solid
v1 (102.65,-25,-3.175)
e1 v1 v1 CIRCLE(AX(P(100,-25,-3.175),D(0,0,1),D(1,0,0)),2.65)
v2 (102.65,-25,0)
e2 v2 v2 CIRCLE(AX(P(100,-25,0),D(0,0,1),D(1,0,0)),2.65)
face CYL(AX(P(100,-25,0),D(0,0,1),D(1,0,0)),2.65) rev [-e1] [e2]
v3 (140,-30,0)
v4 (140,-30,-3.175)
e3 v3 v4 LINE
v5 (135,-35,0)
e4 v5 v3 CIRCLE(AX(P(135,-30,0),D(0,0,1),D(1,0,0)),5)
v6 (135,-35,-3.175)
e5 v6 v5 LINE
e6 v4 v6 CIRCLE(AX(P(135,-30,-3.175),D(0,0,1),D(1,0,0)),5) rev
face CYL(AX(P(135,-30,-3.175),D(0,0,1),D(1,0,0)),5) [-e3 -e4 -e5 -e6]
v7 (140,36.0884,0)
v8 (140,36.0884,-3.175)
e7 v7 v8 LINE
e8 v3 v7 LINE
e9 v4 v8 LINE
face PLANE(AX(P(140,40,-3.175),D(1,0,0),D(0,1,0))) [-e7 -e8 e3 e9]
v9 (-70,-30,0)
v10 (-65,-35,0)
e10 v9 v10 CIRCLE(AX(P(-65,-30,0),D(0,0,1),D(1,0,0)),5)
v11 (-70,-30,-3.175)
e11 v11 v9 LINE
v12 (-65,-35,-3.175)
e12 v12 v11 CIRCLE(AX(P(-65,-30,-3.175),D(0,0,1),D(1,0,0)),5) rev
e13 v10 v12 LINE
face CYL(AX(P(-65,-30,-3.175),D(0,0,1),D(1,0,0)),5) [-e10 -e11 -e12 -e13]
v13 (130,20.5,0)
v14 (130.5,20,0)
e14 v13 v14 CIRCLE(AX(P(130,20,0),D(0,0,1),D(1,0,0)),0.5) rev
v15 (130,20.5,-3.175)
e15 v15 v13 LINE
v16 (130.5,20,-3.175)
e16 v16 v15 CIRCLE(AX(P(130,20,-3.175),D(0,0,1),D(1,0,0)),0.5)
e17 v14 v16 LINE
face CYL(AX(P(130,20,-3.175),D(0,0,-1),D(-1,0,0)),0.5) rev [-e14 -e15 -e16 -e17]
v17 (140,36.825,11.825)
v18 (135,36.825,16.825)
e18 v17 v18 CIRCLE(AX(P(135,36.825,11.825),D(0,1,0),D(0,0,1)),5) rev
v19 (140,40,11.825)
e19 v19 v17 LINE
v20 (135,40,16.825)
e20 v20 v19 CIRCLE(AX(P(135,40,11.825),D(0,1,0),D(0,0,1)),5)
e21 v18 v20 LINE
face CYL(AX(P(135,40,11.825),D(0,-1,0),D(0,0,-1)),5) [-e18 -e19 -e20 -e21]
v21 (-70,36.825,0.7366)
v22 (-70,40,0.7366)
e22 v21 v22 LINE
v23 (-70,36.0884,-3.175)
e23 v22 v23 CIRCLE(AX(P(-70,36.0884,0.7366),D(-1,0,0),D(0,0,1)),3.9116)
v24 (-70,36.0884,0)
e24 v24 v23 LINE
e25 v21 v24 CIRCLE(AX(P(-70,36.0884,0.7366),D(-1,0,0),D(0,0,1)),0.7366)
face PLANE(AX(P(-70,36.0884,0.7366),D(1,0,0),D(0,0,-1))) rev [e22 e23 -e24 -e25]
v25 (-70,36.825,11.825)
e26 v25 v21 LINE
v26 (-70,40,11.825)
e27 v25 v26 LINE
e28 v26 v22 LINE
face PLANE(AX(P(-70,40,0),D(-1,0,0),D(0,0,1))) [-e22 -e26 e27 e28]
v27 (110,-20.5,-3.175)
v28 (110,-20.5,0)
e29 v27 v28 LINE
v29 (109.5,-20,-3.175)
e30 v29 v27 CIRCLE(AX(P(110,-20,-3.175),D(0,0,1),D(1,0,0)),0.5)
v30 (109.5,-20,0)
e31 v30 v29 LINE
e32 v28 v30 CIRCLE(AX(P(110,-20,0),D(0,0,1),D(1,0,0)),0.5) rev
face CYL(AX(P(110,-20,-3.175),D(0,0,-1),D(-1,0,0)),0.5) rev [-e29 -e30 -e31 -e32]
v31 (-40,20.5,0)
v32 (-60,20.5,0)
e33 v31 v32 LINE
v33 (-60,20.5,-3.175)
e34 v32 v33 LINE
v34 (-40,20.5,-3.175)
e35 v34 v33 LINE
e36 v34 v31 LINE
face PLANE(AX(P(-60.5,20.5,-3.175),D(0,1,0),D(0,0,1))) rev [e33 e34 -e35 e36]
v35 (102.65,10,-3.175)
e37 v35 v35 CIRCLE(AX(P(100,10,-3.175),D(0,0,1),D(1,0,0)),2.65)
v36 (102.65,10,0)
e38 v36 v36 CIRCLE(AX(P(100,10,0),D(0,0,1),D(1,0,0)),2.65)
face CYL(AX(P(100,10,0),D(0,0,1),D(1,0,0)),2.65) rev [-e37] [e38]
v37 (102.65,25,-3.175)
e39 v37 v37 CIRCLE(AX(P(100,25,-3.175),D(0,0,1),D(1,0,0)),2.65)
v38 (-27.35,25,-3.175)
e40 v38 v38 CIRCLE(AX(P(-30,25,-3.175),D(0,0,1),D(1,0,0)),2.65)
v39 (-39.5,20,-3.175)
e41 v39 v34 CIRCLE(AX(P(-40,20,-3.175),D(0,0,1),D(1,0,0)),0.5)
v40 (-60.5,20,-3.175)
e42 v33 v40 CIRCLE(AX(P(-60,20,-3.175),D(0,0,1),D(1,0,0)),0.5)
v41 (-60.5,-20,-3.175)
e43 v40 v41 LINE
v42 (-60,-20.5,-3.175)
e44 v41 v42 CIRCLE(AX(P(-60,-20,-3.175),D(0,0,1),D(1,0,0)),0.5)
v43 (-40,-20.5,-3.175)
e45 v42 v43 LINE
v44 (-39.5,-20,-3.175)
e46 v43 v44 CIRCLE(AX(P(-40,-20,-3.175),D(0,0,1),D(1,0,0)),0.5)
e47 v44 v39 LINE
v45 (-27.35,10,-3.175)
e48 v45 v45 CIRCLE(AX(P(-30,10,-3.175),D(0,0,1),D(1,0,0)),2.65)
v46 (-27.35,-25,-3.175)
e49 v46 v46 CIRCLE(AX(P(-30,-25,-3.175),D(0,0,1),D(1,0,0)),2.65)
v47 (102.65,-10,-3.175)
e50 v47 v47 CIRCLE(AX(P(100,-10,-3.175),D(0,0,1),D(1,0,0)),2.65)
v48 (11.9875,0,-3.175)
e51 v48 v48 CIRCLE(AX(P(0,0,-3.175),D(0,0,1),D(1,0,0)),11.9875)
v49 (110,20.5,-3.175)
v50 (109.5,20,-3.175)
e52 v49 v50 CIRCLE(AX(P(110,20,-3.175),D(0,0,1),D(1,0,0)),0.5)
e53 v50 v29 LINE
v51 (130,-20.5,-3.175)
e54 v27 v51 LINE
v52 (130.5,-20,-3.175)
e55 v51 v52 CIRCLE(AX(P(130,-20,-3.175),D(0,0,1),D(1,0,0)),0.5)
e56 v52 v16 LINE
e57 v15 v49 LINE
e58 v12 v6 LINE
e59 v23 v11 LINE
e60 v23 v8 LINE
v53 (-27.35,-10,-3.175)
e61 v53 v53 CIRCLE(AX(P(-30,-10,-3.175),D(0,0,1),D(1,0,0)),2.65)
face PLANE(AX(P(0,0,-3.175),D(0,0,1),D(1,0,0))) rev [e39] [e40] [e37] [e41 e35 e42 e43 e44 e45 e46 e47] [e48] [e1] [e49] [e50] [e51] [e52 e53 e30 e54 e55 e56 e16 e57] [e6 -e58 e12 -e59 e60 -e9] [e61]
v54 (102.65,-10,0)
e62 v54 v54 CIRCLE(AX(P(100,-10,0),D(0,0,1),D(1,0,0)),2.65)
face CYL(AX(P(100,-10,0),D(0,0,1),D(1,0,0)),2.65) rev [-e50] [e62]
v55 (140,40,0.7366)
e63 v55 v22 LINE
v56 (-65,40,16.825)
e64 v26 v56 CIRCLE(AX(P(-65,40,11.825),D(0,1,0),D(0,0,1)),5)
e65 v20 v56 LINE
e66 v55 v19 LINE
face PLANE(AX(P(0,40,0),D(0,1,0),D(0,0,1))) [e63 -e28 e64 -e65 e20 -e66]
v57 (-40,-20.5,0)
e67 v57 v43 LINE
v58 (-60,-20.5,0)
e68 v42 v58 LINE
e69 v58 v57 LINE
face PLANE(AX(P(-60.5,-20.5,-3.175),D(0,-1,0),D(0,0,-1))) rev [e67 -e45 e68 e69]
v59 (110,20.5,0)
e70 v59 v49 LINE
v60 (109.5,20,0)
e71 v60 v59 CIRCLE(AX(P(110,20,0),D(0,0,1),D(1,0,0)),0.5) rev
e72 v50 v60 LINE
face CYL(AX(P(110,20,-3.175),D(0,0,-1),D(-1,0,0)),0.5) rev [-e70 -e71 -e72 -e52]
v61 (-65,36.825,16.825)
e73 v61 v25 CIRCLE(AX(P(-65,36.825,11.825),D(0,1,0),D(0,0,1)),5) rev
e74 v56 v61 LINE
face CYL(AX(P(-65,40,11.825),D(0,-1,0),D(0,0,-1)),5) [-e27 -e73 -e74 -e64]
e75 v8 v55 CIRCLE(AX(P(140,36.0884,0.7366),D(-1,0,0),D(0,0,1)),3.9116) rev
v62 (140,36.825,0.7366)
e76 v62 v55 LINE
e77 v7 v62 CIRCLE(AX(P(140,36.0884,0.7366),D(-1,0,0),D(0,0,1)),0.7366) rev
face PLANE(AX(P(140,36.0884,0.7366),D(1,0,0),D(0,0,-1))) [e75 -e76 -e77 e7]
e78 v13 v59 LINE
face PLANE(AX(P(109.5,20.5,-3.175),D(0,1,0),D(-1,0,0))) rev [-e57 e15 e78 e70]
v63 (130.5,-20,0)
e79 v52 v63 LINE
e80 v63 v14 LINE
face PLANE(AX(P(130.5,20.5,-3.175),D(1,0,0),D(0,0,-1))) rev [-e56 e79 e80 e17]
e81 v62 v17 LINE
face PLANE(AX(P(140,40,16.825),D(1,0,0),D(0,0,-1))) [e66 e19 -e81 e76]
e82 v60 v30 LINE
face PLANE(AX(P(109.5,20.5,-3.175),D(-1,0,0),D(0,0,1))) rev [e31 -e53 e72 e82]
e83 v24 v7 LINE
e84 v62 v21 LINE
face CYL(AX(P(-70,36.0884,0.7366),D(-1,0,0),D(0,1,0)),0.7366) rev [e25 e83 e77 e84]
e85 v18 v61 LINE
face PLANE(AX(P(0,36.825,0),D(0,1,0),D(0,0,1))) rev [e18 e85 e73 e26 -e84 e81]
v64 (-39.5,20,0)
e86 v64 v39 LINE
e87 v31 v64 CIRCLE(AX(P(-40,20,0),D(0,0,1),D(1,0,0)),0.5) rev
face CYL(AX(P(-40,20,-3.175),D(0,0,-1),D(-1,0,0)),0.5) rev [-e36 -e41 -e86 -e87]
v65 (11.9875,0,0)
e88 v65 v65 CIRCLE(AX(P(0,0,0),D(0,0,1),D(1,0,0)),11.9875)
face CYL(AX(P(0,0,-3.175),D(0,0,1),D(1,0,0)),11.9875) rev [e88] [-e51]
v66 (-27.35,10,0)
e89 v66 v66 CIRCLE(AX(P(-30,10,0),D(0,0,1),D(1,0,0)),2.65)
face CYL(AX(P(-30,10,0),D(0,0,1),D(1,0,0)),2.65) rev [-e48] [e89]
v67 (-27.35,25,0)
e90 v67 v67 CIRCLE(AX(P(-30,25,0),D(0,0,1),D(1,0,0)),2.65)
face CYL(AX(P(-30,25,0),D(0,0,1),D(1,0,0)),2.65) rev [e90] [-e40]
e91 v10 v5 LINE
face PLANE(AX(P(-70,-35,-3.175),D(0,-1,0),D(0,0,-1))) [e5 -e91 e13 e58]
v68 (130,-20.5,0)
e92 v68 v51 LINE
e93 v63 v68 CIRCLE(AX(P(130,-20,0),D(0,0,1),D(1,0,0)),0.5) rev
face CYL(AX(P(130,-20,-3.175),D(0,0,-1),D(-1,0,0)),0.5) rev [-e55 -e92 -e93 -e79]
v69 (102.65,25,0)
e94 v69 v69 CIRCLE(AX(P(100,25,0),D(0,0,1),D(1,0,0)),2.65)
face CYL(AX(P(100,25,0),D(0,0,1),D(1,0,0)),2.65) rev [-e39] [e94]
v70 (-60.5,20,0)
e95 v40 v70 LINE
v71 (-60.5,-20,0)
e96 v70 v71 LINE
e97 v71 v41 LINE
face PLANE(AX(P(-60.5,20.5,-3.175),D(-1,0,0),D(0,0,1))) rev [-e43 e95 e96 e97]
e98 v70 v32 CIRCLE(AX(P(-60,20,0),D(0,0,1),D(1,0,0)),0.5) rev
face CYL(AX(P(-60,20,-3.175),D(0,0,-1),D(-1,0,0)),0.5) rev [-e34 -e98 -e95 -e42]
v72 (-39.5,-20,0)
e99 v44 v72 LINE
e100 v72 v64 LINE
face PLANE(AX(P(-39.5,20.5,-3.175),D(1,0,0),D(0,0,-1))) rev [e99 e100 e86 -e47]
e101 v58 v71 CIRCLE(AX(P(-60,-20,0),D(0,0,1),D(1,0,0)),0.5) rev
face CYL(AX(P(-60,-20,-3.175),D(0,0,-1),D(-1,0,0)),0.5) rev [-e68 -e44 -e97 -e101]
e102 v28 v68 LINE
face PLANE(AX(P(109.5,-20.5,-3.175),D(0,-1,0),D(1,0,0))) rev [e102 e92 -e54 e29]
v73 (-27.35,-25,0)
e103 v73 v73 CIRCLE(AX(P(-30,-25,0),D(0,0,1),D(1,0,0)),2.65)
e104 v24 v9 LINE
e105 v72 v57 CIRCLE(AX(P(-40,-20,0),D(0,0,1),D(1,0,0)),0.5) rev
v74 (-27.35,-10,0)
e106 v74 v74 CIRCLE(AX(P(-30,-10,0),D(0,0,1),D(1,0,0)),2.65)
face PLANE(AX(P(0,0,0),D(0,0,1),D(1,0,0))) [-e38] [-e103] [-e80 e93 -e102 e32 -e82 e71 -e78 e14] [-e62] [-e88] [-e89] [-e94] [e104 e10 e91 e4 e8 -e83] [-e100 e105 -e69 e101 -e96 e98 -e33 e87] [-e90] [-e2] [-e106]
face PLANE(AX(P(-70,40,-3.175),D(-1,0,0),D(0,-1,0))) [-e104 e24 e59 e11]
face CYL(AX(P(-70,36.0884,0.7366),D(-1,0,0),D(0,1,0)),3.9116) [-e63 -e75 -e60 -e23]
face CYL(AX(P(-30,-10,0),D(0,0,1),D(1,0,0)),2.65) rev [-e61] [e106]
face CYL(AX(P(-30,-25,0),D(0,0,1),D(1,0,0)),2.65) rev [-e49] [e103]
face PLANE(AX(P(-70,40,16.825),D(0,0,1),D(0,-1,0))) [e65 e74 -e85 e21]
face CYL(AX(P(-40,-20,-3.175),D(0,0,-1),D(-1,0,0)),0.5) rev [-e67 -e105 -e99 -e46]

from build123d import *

# Parameters (mm, degrees)
SKETCH1_W                    = 210
SKETCH1_H                    = 75
SKETCH1_R                    = 11.9875
SKETCH1_W_2                  = 21
SKETCH1_H_2                  = 41
BASE_FLANGE1_DEPTH           = 3.175
EDGE_FLANGE1_STRIP_W         = 14.1732
EDGE_FLANGE1_STRIP_H         = 3.175
EDGE_FLANGE1_STRIP_CUT_DEPTH = 210
EDGE_FLANGE1_DEPTH           = 210
M5_CLEARANCE_HOLE1_D         = 5.3
FILLET1_R                    = 5
FILLET2_R                    = 0.5


# Sheet-metal steps are written as plain solids
with BuildPart() as part:
    # Sketch1 → Base-Flange1 (new body)
    with BuildSketch(Plane.XY):
        with Locations((35, 2.5)):
            Rectangle(SKETCH1_W, SKETCH1_H)
        Circle(SKETCH1_R, mode=Mode.SUBTRACT)
        with Locations((-50, 0)):
            Rectangle(SKETCH1_W_2, SKETCH1_H_2, mode=Mode.SUBTRACT)
        with Locations((120, 0)):
            Rectangle(SKETCH1_W_2, SKETCH1_H_2, mode=Mode.SUBTRACT)
    extrude(amount=-BASE_FLANGE1_DEPTH)

    # Edge-Flange1 strip (across the edge) → Edge-Flange1 strip cut (cut)
    with BuildSketch(Plane(origin=(140, 40, 0), x_dir=(0, -1, 0), z_dir=(-1, 0, 0))):
        with Locations((-3.175, -1.5875)):
            Rectangle(EDGE_FLANGE1_STRIP_W, EDGE_FLANGE1_STRIP_H)
    extrude(amount=EDGE_FLANGE1_STRIP_CUT_DEPTH, mode=Mode.SUBTRACT)

    # Edge-Flange1 section (across the edge) → Edge-Flange1 (add)
    with BuildSketch(Plane(origin=(140, 40, 0), x_dir=(0, -1, 0), z_dir=(-1, 0, 0))):
        with BuildLine():
            Line((0, 0.7366), (0, 16.825))
            Line((0, 16.825), (3.175, 16.825))
            Line((3.175, 16.825), (3.175, 0.7366))
            ThreePointArc((3.175, 0.7366), (3.390745145, 0.215745145), (3.9116, 0))
            Line((3.9116, 0), (3.9116, -3.175))
            ThreePointArc((3.9116, -3.175), (1.145681115, -2.029318885), (0, 0.7366))
        make_face()
    extrude(amount=EDGE_FLANGE1_DEPTH)

    # M5 Clearance Hole1 (through all)
    with Locations(Plane(origin=(-30, 25, 0), x_dir=(1, 0, 0), z_dir=(0, 0, 1))):
        with Locations((0, 0), (0, -50), (130, -50), (130, 0), (0, -15), (0, -35), (130, -35), (130, -15)):
            Hole(M5_CLEARANCE_HOLE1_D / 2)

    # Fillet1
    fillet1_edges = [part.edges().sort_by_distance(p)[0] for p in [
        (140, 38.4125, 16.825),
        (-70, 38.4125, 16.825),
        (140, -35, -1.5875),
        (-70, -35, -1.5875),
    ]]
    fillet(fillet1_edges, radius=FILLET1_R)

    # Fillet2
    fillet2_edges = [part.edges().sort_by_distance(p)[0] for p in [
        (-60.5, -20.5, -1.5875),
        (-60.5, 20.5, -1.5875),
        (-39.5, 20.5, -1.5875),
        (-39.5, -20.5, -1.5875),
        (109.5, -20.5, -1.5875),
        (109.5, 20.5, -1.5875),
        (130.5, 20.5, -1.5875),
        (130.5, -20.5, -1.5875),
    ]]
    fillet(fillet2_edges, radius=FILLET2_R)


solid = part.part
